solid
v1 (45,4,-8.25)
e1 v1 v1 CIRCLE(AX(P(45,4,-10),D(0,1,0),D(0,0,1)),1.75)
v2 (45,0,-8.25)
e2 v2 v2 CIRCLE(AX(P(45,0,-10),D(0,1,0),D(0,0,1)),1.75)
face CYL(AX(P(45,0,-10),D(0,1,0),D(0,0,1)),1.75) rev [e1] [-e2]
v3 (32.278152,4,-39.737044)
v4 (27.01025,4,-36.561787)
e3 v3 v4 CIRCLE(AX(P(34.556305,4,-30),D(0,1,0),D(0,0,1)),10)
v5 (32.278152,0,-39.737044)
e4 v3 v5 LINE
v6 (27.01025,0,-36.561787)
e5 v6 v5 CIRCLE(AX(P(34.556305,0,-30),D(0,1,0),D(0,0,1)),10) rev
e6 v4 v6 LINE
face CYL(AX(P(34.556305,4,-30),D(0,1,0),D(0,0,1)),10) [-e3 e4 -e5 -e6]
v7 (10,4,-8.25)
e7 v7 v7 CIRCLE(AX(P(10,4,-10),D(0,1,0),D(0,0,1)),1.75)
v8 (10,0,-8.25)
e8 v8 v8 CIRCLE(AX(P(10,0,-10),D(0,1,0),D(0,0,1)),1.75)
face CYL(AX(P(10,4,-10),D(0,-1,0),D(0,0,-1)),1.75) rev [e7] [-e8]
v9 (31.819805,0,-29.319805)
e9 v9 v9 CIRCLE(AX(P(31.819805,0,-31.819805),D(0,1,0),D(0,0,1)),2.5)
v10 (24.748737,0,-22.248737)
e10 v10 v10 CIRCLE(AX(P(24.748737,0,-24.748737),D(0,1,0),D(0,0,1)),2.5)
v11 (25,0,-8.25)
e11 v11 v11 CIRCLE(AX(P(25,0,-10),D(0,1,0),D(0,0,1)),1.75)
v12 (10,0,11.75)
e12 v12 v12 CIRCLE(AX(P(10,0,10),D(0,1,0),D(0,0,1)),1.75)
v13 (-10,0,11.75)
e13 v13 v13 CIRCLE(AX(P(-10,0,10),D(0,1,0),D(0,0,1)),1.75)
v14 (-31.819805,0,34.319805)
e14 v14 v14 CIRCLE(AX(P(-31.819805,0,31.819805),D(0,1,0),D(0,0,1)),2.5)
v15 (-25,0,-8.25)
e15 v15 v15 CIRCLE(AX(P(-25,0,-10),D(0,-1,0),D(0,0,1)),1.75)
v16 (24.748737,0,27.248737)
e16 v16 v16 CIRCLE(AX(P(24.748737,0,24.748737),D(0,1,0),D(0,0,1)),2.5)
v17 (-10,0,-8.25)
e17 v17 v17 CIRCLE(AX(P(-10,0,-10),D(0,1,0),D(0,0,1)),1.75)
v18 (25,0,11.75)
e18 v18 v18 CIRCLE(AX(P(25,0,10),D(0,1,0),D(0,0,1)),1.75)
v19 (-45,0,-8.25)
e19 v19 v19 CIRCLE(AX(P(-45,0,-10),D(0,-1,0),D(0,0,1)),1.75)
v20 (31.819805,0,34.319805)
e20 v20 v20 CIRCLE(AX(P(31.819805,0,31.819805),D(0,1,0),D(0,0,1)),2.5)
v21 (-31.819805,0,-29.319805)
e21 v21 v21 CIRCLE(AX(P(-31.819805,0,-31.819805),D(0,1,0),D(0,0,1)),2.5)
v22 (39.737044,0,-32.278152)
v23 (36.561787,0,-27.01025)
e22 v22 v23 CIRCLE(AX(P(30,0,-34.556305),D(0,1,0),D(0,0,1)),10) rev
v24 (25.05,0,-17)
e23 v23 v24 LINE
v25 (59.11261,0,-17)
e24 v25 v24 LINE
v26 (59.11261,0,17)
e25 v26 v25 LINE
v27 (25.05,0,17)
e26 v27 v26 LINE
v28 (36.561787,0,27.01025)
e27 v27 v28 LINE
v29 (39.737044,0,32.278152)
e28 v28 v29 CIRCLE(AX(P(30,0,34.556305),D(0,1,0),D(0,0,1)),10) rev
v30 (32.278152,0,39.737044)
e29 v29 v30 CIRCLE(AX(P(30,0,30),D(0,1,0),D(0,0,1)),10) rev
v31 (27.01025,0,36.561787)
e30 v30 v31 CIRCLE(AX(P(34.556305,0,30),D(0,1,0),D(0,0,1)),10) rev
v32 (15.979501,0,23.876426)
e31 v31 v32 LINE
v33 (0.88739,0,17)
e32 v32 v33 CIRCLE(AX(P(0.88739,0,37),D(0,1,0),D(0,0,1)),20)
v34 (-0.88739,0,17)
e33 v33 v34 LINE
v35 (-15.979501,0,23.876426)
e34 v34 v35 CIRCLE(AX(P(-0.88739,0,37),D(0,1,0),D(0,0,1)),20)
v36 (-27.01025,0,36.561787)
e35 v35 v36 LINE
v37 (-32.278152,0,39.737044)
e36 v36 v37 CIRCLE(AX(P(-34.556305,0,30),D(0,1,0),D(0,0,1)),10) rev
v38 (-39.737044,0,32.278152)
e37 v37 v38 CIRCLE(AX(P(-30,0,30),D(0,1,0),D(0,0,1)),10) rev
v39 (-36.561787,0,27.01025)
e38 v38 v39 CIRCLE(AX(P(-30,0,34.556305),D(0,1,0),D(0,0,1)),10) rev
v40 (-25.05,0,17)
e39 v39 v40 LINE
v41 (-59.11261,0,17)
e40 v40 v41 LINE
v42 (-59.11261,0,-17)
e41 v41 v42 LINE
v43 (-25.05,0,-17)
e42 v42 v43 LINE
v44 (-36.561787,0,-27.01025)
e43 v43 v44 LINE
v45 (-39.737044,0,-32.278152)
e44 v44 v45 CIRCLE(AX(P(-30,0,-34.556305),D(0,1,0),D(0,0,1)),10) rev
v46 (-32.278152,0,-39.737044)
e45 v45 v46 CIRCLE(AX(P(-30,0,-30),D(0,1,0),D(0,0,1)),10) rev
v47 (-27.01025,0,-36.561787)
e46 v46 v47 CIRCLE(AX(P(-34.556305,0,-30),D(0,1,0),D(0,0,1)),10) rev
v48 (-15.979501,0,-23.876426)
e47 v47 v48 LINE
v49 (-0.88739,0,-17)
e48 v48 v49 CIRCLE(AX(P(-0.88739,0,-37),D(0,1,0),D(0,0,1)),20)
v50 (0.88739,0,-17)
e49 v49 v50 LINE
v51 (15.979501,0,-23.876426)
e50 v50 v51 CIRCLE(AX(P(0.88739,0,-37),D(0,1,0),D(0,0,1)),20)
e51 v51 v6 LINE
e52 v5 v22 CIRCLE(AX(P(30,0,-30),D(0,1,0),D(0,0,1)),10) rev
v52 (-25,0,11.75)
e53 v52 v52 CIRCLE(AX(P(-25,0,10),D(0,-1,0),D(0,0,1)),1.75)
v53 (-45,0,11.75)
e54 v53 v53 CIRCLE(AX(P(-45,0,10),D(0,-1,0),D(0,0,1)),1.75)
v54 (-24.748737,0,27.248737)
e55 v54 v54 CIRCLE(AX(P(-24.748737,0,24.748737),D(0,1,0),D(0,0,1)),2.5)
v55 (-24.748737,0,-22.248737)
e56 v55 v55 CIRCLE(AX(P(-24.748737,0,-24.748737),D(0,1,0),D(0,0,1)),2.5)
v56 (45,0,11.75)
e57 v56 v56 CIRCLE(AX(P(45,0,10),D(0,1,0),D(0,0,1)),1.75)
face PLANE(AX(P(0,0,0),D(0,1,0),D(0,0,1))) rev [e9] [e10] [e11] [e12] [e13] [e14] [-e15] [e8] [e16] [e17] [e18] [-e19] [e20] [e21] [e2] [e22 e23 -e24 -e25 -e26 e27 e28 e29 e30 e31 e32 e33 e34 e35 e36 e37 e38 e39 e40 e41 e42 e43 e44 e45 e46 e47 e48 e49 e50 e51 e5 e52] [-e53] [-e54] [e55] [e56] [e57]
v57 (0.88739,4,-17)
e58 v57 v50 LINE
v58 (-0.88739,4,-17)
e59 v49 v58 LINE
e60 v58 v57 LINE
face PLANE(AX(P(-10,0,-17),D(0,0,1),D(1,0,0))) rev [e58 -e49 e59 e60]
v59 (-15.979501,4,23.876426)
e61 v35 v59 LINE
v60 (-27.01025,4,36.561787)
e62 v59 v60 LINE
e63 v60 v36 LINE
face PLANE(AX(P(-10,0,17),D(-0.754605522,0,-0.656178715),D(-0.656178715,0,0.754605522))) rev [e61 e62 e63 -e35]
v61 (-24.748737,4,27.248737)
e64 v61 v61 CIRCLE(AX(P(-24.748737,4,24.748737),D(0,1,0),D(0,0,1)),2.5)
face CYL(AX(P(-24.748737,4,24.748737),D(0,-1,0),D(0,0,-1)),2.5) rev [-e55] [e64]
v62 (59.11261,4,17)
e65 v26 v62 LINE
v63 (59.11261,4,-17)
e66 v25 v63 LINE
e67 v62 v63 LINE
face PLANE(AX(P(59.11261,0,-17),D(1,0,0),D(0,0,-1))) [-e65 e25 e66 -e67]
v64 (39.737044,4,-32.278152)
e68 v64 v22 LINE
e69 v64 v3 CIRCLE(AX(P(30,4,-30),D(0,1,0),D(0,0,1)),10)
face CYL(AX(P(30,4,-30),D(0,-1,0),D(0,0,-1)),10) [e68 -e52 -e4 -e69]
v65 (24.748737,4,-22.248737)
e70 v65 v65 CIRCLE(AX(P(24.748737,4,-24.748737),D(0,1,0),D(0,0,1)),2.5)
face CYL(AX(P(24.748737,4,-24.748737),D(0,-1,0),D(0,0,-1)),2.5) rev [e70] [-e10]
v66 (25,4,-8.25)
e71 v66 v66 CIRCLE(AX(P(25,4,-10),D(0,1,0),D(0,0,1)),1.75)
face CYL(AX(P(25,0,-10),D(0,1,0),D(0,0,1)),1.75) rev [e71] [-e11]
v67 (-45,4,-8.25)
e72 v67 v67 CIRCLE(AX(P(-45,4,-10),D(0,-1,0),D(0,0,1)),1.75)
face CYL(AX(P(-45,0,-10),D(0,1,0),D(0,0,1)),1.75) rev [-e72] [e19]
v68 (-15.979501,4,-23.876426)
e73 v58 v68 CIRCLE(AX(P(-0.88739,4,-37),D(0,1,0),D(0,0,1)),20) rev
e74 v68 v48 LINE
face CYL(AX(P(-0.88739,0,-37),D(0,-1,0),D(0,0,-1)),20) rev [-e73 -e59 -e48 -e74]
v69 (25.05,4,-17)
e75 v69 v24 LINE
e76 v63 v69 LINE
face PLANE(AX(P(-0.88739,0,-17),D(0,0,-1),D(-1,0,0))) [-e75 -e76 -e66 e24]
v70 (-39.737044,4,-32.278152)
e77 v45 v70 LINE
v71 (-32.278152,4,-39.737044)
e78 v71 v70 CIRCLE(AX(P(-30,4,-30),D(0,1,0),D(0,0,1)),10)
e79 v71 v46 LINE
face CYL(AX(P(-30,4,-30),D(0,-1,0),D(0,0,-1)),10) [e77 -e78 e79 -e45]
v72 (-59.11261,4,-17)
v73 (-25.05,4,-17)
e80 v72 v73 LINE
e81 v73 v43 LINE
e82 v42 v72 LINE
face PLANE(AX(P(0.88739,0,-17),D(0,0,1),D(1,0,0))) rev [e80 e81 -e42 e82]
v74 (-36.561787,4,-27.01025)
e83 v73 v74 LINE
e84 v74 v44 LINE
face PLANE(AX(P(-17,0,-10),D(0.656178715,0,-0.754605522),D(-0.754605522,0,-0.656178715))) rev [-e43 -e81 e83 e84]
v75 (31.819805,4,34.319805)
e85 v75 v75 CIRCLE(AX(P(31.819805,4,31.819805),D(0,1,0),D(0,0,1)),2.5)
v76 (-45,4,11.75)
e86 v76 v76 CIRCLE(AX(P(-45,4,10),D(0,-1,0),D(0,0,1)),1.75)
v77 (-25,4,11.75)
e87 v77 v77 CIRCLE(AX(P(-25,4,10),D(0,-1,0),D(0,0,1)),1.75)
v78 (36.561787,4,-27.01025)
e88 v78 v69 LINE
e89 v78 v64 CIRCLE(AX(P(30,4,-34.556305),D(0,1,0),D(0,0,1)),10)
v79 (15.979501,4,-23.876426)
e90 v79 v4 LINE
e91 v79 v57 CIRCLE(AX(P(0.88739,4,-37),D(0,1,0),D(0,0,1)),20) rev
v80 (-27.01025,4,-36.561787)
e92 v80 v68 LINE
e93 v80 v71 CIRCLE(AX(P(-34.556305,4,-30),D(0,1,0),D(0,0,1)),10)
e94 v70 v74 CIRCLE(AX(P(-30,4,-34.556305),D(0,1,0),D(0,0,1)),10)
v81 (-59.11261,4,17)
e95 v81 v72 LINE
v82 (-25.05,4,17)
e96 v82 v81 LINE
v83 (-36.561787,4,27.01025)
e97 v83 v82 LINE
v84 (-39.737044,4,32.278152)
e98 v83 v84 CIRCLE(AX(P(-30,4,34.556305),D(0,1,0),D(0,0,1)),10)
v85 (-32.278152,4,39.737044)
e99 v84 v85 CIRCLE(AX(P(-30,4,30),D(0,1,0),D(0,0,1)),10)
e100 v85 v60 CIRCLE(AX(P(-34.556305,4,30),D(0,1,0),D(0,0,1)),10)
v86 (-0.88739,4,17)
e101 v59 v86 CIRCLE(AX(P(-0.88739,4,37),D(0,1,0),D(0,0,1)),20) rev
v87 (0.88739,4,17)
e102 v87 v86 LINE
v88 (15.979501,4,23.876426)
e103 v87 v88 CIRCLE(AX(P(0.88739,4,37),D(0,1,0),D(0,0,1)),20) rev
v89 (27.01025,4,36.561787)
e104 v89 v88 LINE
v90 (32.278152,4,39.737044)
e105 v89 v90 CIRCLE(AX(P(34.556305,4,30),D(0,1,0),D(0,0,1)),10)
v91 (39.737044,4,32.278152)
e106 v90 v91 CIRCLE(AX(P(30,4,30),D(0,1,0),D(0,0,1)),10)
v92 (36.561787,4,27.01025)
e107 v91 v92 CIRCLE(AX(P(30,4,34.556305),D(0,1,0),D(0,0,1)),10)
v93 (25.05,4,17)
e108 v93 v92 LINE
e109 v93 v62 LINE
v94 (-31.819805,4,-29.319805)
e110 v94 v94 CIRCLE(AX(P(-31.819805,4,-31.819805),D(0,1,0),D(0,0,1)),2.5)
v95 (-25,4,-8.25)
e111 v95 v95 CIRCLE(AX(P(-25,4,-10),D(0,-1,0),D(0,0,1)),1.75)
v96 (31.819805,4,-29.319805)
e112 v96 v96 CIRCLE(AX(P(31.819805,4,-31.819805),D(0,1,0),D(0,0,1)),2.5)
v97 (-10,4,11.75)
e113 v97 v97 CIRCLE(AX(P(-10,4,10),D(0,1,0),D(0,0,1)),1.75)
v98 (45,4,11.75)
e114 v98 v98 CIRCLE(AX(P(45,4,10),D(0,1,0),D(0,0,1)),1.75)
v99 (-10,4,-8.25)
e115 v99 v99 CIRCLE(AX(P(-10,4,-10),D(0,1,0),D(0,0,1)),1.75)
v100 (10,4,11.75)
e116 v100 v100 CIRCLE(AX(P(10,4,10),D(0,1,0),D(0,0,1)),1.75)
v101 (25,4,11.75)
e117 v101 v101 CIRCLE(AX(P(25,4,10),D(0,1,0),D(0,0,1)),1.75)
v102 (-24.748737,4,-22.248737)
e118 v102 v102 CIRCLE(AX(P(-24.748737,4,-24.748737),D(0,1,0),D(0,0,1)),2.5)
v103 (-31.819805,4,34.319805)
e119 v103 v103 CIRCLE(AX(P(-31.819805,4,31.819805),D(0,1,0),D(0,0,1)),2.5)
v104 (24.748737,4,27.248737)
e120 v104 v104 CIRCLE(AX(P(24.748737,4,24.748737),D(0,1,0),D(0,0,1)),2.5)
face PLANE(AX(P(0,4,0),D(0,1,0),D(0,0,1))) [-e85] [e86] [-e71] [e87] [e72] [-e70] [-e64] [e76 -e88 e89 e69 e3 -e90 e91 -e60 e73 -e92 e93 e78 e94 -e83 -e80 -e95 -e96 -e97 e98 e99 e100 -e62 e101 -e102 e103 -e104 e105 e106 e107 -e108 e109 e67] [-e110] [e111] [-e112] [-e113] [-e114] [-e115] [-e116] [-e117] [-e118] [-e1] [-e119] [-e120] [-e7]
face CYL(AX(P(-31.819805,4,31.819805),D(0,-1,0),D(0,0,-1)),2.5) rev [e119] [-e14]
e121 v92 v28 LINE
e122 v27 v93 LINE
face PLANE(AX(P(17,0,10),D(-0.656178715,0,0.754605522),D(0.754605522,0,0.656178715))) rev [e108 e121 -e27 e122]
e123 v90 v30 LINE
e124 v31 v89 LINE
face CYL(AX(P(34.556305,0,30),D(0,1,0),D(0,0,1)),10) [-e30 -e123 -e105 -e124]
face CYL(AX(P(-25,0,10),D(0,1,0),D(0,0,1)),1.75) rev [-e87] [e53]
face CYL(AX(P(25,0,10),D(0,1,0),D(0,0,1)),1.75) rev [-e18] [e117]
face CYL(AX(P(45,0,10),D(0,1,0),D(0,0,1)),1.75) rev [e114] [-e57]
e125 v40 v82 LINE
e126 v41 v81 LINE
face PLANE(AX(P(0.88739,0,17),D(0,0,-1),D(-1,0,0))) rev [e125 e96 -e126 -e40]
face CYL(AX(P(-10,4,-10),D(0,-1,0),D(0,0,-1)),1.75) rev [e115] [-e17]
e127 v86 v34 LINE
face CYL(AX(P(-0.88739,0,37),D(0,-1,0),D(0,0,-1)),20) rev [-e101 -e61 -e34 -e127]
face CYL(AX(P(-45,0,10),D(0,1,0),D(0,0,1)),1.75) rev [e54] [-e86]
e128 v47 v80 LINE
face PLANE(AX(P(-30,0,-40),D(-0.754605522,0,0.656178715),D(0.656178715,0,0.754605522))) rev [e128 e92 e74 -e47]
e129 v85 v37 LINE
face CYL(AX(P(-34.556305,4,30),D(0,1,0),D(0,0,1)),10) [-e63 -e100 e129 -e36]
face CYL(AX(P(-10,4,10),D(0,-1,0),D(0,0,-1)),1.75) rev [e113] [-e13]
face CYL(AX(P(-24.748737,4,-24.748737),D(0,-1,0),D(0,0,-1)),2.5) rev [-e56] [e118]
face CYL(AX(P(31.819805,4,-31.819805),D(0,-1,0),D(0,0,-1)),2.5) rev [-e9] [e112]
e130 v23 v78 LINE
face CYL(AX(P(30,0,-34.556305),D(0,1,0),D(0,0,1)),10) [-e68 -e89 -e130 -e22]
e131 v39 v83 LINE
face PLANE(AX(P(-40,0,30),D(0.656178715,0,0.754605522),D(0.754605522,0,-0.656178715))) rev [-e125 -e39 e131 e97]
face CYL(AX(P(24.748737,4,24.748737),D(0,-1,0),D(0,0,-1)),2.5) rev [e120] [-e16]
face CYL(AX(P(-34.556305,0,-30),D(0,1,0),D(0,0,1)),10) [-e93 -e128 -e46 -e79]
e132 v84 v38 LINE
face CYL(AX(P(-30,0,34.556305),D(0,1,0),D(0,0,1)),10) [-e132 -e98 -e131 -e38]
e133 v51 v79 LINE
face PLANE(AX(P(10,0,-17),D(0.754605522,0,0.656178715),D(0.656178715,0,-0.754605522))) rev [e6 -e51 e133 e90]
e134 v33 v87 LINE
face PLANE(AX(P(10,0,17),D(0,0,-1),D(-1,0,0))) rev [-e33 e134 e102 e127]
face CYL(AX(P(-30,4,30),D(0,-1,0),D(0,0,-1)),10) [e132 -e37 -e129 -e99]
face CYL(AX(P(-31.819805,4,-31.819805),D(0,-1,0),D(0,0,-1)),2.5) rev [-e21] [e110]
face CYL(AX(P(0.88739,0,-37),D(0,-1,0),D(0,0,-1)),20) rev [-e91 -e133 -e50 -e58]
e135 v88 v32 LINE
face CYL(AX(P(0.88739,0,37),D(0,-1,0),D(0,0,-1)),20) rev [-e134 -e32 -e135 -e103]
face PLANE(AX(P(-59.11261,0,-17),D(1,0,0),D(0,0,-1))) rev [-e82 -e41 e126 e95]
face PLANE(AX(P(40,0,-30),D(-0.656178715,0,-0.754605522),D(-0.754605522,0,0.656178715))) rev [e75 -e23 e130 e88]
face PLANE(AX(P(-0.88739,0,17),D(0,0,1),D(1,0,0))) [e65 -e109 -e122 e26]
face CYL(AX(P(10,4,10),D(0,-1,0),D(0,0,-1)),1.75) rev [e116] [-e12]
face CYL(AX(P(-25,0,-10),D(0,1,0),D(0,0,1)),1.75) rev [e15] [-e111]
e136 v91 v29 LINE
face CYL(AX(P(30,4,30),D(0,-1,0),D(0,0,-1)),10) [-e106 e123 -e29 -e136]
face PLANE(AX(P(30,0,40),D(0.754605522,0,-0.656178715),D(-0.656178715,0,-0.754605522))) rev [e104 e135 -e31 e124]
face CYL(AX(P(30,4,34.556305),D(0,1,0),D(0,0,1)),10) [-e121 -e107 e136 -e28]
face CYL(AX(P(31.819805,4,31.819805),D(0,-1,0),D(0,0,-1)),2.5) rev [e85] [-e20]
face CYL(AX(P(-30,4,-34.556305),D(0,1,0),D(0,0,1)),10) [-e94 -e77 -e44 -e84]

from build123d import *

# Parameters (mm, degrees)
SKETCH1_W           = 80
SKETCH1_H           = 80
SKETCH1_R           = 2.5
SKETCH1_R_2         = 1.75
BOSS_EXTRUDE1_DEPTH = 4
CUT_EXTRUDE2_DEPTH  = 57.709787515
FILLET1_R           = 10
FILLET2_R           = 20
BOSS_EXTRUDE3_DEPTH = 4
SKETCH6_R           = 1.75
CUT_EXTRUDE3_DEPTH  = 4


with BuildPart() as part:
    # Sketch1 → Boss-Extrude1 (new body)
    with BuildSketch(Plane(origin=(0, 0, 0), x_dir=(1, 0, 0), z_dir=(0, 1, 0))):
        Rectangle(SKETCH1_W, SKETCH1_H)
        with Locations(Location((-24.748737342, 24.748737342, 0), (0, 0, 270))):
            Circle(SKETCH1_R, mode=Mode.SUBTRACT)
        with Locations(Location((24.748737342, 24.748737342, 0), (0, 0, 270))):
            Circle(SKETCH1_R, mode=Mode.SUBTRACT)
        with Locations(Location((24.748737342, -24.748737342, 0), (0, 0, 270))):
            Circle(SKETCH1_R, mode=Mode.SUBTRACT)
        with Locations(Location((-24.748737342, -24.748737342, 0), (0, 0, 270))):
            Circle(SKETCH1_R, mode=Mode.SUBTRACT)
        with Locations(Location((-10, 10, 0), (0, 0, 270))):
            Circle(SKETCH1_R_2, mode=Mode.SUBTRACT)
        with Locations(Location((10, 10, 0), (0, 0, 270))):
            Circle(SKETCH1_R_2, mode=Mode.SUBTRACT)
        with Locations(Location((10, -10, 0), (0, 0, 270))):
            Circle(SKETCH1_R_2, mode=Mode.SUBTRACT)
        with Locations(Location((-10, -10, 0), (0, 0, 270))):
            Circle(SKETCH1_R_2, mode=Mode.SUBTRACT)
        with Locations(Location((31.819805153, 31.819805153, 0), (0, 0, 270))):
            Circle(SKETCH1_R, mode=Mode.SUBTRACT)
        with Locations(Location((-31.819805153, 31.819805153, 0), (0, 0, 270))):
            Circle(SKETCH1_R, mode=Mode.SUBTRACT)
        with Locations(Location((-31.819805153, -31.819805153, 0), (0, 0, 270))):
            Circle(SKETCH1_R, mode=Mode.SUBTRACT)
        with Locations(Location((31.819805153, -31.819805153, 0), (0, 0, 270))):
            Circle(SKETCH1_R, mode=Mode.SUBTRACT)
    extrude(amount=BOSS_EXTRUDE1_DEPTH)

    # Sketch2 → Cut-Extrude2 (cut, through all)
    with BuildSketch(Plane(origin=(0, 4, 0), x_dir=(1, 0, 0), z_dir=(0, 1, 0))):
        Polygon((-40, 30), (-40, -30), (-17, -10), (-17, 10), align=None)
        Polygon((30, 40), (-30, 40), (-10, 17), (10, 17), align=None)
        Polygon((40, -30), (40, 30), (17, 10), (17, -10), align=None)
        Polygon((-30, -40), (30, -40), (10, -17), (-10, -17), align=None)
    extrude(amount=-CUT_EXTRUDE2_DEPTH, mode=Mode.SUBTRACT)

    # Fillet1
    # the kernel refuses this fillet: 10 mm, written as the material it takes off along each edge
    with BuildSketch(Plane(origin=(-30, 15.390762292, 40), x_dir=(-1, 0, 0), z_dir=(0, -1, 0)), Plane(origin=(-40, 15.390762292, 30), x_dir=(0.754605522163505, 0, -0.6561787149247863), z_dir=(0, -1, 0)), Plane(origin=(-40, 15.390762292, -30), x_dir=(0, 0, -1), z_dir=(0, -1, 0)), Plane(origin=(-30, 15.390762292, -40), x_dir=(0.6561787149247871, 0, 0.7546055221635043), z_dir=(0, -1, 0)), Plane(origin=(30, 15.390762292, -40), x_dir=(1, 0, 0), z_dir=(0, -1, 0)), Plane(origin=(40, 15.390762292, -30), x_dir=(-0.7546055221635045, 0, 0.6561787149247867), z_dir=(0, -1, 0)), Plane(origin=(40, 15.390762292, 30), x_dir=(0, 0, 1), z_dir=(0, -1, 0))) as fillet1_piece_1:
        with BuildLine():
            CenterArc((FILLET1_R * 0.455630491663, FILLET1_R), FILLET1_R, 221.009086902, 48.990913098)
            Line((-FILLET1_R * 0.2989750305, FILLET1_R * 0.343821285075), (0, 0))
            Line((0, 0), (FILLET1_R * 0.455630491663, 0))
        make_face()
    extrude(amount=26.781524583, mode=Mode.SUBTRACT)
    with BuildSketch(Plane(origin=(-40, -25, 40), x_dir=(0, 0, -1), z_dir=(0, 1, 0)), Plane(origin=(-40, -25, -40), x_dir=(1, 0, 0), z_dir=(0, 1, 0)), Plane(origin=(40, -25, -40), x_dir=(0, 0, 1), z_dir=(0, 1, 0)), Plane(origin=(40, -25, 40), x_dir=(-1, 0, 0), z_dir=(0, 1, 0))) as fillet1_piece_2:
        with BuildLine():
            CenterArc((FILLET1_R, -FILLET1_R), FILLET1_R, 90, 90)
            Line((0, -FILLET1_R), (0, 0))
            Line((0, 0), (FILLET1_R, 0))
        make_face()
    extrude(amount=54, mode=Mode.SUBTRACT)
    with BuildSketch(Plane(origin=(30, 15.390762292, 40), x_dir=(1, 0, 0), z_dir=(0, -1, 0))) as fillet1_piece_3:
        with BuildLine():
            CenterArc((FILLET1_R * 0.455630491663, -FILLET1_R), FILLET1_R, 90, 48.990913098)
            Line((-FILLET1_R * 0.2989750305, -FILLET1_R * 0.343821285075), (0, 0))
            Line((0, 0), (FILLET1_R * 0.455630491663, 0))
        make_face()
    extrude(amount=26.781524583, mode=Mode.SUBTRACT)

    # Fillet2
    fillet2_edges = [part.edges().sort_by_distance(p)[0] for p in [
        (10, 2, 17),
        (-10, 2, 17),
        (-17, 2, 10),
        (-17, 2, -10),
        (17, 2, -10),
        (17, 2, 10),
        (-10, 2, -17),
        (10, 2, -17),
    ]]
    fillet(fillet2_edges, radius=FILLET2_R)

    # Sketch5 → Boss-Extrude3 (add)
    with BuildSketch(Plane(origin=(0, 4, 0), x_dir=(1, 0, 0), z_dir=(0, 1, 0))):
        Polygon((-0.887390167, 17), (13.289046487, 12.123524967), (13.289046487, -13.496190448), (-0.887390167, -17), (59.112609833, -17), (59.112609833, 17), align=None)
    boss_extrude3 = extrude(amount=-BOSS_EXTRUDE3_DEPTH)

    # Sketch6 → Cut-Extrude3 (cut)
    with BuildSketch(Plane(origin=(0, 4, 0), x_dir=(1, 0, 0), z_dir=(0, 1, 0))):
        with Locations(Location((25, 10, 0), (0, 0, 270))):
            Circle(SKETCH6_R)
        with Locations(Location((45, 10, 0), (0, 0, 270))):
            Circle(SKETCH6_R)
        with Locations(Location((25, -10, 0), (0, 0, 270))):
            Circle(SKETCH6_R)
        with Locations(Location((45, -10, 0), (0, 0, 270))):
            Circle(SKETCH6_R)
    cut_extrude3 = extrude(amount=-CUT_EXTRUDE3_DEPTH, mode=Mode.SUBTRACT)

    # Mirror1: Boss-Extrude3, Cut-Extrude3 across plane
    add(boss_extrude3.mirror(Plane(origin=(0, 0, 0), x_dir=(0, 0, 1), z_dir=(1, 0, 0))))
    add(cut_extrude3.mirror(Plane(origin=(0, 0, 0), x_dir=(0, 0, 1), z_dir=(1, 0, 0))), mode=Mode.SUBTRACT)


solid = part.part
